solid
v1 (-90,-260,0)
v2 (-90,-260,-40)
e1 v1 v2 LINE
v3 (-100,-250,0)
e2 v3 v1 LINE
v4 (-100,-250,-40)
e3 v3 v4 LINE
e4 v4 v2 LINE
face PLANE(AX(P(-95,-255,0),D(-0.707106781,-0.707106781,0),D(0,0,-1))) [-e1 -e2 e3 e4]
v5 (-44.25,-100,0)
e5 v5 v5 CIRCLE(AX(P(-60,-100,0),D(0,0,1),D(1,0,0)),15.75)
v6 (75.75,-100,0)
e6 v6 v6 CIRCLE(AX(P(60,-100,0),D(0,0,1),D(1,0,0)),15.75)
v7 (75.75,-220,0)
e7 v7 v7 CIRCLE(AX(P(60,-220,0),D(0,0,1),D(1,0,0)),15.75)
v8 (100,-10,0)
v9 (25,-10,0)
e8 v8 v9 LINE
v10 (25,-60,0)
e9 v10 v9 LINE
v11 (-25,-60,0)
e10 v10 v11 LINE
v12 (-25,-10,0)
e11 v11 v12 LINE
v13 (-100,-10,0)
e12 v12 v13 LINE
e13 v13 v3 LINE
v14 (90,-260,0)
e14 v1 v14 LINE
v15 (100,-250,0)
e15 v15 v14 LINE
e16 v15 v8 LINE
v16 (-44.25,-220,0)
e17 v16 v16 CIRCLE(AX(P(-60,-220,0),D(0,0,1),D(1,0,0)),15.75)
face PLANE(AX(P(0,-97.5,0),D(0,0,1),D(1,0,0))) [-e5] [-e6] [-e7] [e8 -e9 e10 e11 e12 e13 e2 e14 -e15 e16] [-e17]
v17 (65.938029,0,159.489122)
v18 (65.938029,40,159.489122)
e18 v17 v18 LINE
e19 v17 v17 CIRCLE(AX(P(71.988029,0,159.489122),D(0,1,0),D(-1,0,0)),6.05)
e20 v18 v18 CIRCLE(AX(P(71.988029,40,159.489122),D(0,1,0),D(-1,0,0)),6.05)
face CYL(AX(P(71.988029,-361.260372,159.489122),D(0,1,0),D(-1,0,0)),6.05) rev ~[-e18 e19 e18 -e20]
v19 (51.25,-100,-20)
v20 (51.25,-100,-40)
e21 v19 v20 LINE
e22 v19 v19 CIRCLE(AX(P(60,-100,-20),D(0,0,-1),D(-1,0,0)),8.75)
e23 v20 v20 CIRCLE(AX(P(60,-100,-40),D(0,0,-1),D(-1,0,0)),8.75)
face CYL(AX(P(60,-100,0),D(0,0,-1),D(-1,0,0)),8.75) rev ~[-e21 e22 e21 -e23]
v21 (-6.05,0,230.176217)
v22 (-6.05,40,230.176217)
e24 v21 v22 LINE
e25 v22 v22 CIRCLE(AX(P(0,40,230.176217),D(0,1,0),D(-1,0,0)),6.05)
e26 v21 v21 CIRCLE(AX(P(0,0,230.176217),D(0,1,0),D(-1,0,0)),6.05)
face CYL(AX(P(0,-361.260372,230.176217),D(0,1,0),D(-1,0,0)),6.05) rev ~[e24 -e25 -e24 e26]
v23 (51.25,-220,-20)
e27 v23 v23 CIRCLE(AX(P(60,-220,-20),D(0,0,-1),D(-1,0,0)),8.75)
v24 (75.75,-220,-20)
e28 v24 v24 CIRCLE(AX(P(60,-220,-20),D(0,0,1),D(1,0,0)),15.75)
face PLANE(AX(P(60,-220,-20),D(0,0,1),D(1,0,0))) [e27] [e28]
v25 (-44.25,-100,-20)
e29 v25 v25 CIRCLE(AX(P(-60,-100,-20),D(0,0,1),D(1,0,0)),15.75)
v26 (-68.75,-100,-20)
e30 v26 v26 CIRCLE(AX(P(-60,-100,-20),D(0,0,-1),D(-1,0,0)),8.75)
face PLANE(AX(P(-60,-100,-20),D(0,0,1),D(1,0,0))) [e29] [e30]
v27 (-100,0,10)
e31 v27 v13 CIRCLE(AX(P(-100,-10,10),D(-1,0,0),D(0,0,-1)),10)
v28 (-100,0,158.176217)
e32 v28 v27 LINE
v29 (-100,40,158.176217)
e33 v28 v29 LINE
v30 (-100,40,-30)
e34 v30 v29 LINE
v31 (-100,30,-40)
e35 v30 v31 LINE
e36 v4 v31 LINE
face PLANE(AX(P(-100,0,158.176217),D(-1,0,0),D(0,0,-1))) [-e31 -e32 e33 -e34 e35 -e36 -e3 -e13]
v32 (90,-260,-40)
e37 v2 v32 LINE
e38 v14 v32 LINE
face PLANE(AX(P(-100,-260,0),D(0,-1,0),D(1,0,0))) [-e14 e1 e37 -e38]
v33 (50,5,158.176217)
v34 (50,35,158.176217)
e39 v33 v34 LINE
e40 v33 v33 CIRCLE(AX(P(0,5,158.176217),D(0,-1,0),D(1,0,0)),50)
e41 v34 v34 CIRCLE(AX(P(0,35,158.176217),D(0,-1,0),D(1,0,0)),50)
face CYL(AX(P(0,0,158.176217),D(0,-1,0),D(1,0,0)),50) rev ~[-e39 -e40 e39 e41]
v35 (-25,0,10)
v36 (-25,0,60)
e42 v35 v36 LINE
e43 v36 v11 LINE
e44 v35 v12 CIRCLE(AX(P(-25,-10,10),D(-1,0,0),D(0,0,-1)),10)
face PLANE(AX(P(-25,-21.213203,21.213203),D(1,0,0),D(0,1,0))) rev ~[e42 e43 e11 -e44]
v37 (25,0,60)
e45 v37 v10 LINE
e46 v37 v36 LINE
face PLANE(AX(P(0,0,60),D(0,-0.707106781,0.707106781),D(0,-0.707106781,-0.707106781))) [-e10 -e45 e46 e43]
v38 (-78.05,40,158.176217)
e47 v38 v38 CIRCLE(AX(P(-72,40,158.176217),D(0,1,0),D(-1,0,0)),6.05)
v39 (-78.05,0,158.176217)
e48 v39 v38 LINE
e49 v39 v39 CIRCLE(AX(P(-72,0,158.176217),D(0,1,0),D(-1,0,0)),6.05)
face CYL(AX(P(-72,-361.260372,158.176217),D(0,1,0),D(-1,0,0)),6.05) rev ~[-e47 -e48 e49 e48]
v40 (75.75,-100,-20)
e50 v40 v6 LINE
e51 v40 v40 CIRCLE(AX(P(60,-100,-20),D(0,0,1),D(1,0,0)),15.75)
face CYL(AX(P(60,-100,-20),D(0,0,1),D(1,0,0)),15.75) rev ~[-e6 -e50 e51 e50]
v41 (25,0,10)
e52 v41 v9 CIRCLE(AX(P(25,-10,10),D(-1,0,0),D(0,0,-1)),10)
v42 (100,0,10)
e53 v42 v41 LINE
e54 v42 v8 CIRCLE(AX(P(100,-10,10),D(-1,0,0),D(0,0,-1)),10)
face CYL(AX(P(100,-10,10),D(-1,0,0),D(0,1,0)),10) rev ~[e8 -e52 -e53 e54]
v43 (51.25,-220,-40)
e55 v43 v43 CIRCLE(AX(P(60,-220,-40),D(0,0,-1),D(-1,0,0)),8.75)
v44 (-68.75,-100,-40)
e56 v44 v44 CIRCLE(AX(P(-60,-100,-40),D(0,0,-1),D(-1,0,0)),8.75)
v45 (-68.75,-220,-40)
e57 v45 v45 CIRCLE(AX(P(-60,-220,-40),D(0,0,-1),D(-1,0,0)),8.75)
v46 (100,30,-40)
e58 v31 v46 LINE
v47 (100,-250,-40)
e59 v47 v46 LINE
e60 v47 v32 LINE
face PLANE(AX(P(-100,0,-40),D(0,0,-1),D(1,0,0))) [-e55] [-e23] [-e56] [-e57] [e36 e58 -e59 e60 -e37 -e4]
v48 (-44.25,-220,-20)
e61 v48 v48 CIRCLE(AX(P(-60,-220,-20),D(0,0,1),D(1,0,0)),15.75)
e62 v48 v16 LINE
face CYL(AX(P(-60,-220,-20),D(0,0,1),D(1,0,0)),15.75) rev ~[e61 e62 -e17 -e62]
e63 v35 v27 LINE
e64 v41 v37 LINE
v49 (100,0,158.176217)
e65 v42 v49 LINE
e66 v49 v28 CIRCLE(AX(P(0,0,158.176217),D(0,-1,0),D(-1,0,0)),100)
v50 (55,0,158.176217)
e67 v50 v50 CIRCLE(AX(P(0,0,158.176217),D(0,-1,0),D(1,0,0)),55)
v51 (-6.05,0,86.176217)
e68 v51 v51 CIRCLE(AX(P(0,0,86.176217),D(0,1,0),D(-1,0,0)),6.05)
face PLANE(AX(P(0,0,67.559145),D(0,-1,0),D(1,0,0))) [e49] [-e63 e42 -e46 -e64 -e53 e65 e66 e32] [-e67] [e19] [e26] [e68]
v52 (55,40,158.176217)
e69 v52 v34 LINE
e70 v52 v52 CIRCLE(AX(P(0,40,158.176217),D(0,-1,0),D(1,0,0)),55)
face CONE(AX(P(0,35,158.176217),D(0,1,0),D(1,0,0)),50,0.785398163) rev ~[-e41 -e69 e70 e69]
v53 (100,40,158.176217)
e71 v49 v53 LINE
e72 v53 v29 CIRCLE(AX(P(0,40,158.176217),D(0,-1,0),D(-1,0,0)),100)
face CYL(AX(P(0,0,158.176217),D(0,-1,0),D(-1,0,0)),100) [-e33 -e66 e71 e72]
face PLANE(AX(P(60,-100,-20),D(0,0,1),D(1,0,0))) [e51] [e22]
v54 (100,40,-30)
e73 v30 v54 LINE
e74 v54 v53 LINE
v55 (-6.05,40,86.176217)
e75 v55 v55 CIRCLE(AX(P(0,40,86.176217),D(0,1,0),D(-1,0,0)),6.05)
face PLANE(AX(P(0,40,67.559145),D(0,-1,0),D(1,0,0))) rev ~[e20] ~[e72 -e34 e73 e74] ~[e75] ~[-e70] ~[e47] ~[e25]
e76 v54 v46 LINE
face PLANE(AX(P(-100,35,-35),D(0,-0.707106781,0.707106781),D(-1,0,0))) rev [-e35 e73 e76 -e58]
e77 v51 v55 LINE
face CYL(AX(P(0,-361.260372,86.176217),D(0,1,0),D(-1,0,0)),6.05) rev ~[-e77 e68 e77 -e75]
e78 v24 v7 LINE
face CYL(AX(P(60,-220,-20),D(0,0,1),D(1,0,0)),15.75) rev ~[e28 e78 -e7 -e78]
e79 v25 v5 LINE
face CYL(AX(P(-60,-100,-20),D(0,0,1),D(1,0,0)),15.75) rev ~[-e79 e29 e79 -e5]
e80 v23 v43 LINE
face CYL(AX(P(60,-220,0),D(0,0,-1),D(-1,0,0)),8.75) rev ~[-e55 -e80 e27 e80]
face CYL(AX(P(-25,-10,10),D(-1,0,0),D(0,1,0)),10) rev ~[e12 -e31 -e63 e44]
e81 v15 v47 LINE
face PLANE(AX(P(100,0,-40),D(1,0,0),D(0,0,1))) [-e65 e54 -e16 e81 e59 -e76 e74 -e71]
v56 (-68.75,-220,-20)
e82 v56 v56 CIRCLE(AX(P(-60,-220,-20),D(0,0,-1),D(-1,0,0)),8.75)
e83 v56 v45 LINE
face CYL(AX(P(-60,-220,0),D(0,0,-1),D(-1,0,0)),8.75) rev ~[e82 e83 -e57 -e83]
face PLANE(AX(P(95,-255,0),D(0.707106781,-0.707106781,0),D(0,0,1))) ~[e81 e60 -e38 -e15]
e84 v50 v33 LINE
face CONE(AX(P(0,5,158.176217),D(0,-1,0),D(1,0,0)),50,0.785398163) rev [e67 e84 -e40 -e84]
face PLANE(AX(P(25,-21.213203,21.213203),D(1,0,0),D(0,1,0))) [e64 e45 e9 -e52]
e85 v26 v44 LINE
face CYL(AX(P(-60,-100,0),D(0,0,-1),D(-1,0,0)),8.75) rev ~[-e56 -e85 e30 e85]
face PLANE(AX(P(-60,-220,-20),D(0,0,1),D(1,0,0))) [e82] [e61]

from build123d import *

# Parameters (mm, degrees)
F0_R           = 50
F1_DEPTH       = 40
F2_D           = 12.1
F3_W           = 50
F3_H           = 100
F4_DEPTH       = 40
F5_D           = 17.5
F5_CBORE_D     = 31.5
F5_CBORE_DEPTH = 20
F7_DEPTH       = 25
F8_SIZE        = 5
F9_SIZE        = 10
F10_R          = 10


# Not quite as in the source:
# - a feature names something its author has since deleted; it is built from what else it names


with BuildPart() as f1:
    # F0 (on Front) → F1 (new body)
    with BuildSketch(Plane.XZ):
        with BuildLine():
            Line((-100, 158.1762170792), (-100, 0))
            Line((-100, 0), (100, 0))
            Line((100, 0), (100, 158.1762170792))
            ThreePointArc((100, 158.1762170792), (0, 58.1762170792), (-100, 158.1762170792))
        make_face()
        Polygon((-100, -40), (0, -40), (100, -40), (100, 0), (-100, 0), align=None)
        with BuildLine():
            ThreePointArc((100, 158.1762170792), (0, 258.1762170792), (-100, 158.1762170792))
            ThreePointArc((-100, 158.1762170792), (0, 58.1762170792), (100, 158.1762170792))
        make_face()
        with Locations((0, 158.1762170792)):
            Circle(F0_R, mode=Mode.SUBTRACT)
    extrude(amount=-F1_DEPTH)

    # F2 (through all)
    with Locations(Plane.XZ):
        with Locations((-72, 158.1762170792), (0, 230.1762170792), (71.9880287234, 159.4891224521), (0, 86.1762170792)):
            Hole(F2_D / 2)

    # F3 (on Top) → F4 (join)
    with BuildSketch(Plane.XY):
        Polygon((-25, 40), (-100, 40), (-100, -220), (-100, -260), (100, -260), (100, -220), (100, 40), (25, 40), (25, -60), (-25, -60), align=None)
        with Locations((0, -10)):
            Rectangle(F3_W, F3_H)
    extrude(amount=-F4_DEPTH)

    # F5 (through all)
    with Locations(Plane.XY):
        with Locations((-60, -100), (60, -100), (60, -220), (-60, -220)):
            CounterBoreHole(F5_D / 2, F5_CBORE_D / 2, F5_CBORE_DEPTH)

    # F6 (on Right) → F7 (join, symmetric)
    with BuildSketch(Plane.YZ):
        Polygon((-60, 0), (0, 0), (0, 60), align=None)
    extrude(amount=F7_DEPTH, both=True)

    # F8
    f8_edges = [f1.edges().sort_by_distance(p)[0] for p in [
        (-50, 0, 158.176217),
        (-50, 40, 158.176217),
    ]]
    chamfer(f8_edges, length=F8_SIZE)

    # F9
    f9_edges = [f1.edges().sort_by_distance(p)[0] for p in [
        (0, 40, -40),
        (-100, -260, -20),
        (100, -260, -20),
    ]]
    chamfer(f9_edges, length=F9_SIZE)

    # F10
    f10_edges = [f1.edges().sort_by_distance(p)[0] for p in [
        (-62.5, 0, 0),
        (62.5, 0, 0),
    ]]
    fillet(f10_edges, radius=F10_R)


solid = f1.part
